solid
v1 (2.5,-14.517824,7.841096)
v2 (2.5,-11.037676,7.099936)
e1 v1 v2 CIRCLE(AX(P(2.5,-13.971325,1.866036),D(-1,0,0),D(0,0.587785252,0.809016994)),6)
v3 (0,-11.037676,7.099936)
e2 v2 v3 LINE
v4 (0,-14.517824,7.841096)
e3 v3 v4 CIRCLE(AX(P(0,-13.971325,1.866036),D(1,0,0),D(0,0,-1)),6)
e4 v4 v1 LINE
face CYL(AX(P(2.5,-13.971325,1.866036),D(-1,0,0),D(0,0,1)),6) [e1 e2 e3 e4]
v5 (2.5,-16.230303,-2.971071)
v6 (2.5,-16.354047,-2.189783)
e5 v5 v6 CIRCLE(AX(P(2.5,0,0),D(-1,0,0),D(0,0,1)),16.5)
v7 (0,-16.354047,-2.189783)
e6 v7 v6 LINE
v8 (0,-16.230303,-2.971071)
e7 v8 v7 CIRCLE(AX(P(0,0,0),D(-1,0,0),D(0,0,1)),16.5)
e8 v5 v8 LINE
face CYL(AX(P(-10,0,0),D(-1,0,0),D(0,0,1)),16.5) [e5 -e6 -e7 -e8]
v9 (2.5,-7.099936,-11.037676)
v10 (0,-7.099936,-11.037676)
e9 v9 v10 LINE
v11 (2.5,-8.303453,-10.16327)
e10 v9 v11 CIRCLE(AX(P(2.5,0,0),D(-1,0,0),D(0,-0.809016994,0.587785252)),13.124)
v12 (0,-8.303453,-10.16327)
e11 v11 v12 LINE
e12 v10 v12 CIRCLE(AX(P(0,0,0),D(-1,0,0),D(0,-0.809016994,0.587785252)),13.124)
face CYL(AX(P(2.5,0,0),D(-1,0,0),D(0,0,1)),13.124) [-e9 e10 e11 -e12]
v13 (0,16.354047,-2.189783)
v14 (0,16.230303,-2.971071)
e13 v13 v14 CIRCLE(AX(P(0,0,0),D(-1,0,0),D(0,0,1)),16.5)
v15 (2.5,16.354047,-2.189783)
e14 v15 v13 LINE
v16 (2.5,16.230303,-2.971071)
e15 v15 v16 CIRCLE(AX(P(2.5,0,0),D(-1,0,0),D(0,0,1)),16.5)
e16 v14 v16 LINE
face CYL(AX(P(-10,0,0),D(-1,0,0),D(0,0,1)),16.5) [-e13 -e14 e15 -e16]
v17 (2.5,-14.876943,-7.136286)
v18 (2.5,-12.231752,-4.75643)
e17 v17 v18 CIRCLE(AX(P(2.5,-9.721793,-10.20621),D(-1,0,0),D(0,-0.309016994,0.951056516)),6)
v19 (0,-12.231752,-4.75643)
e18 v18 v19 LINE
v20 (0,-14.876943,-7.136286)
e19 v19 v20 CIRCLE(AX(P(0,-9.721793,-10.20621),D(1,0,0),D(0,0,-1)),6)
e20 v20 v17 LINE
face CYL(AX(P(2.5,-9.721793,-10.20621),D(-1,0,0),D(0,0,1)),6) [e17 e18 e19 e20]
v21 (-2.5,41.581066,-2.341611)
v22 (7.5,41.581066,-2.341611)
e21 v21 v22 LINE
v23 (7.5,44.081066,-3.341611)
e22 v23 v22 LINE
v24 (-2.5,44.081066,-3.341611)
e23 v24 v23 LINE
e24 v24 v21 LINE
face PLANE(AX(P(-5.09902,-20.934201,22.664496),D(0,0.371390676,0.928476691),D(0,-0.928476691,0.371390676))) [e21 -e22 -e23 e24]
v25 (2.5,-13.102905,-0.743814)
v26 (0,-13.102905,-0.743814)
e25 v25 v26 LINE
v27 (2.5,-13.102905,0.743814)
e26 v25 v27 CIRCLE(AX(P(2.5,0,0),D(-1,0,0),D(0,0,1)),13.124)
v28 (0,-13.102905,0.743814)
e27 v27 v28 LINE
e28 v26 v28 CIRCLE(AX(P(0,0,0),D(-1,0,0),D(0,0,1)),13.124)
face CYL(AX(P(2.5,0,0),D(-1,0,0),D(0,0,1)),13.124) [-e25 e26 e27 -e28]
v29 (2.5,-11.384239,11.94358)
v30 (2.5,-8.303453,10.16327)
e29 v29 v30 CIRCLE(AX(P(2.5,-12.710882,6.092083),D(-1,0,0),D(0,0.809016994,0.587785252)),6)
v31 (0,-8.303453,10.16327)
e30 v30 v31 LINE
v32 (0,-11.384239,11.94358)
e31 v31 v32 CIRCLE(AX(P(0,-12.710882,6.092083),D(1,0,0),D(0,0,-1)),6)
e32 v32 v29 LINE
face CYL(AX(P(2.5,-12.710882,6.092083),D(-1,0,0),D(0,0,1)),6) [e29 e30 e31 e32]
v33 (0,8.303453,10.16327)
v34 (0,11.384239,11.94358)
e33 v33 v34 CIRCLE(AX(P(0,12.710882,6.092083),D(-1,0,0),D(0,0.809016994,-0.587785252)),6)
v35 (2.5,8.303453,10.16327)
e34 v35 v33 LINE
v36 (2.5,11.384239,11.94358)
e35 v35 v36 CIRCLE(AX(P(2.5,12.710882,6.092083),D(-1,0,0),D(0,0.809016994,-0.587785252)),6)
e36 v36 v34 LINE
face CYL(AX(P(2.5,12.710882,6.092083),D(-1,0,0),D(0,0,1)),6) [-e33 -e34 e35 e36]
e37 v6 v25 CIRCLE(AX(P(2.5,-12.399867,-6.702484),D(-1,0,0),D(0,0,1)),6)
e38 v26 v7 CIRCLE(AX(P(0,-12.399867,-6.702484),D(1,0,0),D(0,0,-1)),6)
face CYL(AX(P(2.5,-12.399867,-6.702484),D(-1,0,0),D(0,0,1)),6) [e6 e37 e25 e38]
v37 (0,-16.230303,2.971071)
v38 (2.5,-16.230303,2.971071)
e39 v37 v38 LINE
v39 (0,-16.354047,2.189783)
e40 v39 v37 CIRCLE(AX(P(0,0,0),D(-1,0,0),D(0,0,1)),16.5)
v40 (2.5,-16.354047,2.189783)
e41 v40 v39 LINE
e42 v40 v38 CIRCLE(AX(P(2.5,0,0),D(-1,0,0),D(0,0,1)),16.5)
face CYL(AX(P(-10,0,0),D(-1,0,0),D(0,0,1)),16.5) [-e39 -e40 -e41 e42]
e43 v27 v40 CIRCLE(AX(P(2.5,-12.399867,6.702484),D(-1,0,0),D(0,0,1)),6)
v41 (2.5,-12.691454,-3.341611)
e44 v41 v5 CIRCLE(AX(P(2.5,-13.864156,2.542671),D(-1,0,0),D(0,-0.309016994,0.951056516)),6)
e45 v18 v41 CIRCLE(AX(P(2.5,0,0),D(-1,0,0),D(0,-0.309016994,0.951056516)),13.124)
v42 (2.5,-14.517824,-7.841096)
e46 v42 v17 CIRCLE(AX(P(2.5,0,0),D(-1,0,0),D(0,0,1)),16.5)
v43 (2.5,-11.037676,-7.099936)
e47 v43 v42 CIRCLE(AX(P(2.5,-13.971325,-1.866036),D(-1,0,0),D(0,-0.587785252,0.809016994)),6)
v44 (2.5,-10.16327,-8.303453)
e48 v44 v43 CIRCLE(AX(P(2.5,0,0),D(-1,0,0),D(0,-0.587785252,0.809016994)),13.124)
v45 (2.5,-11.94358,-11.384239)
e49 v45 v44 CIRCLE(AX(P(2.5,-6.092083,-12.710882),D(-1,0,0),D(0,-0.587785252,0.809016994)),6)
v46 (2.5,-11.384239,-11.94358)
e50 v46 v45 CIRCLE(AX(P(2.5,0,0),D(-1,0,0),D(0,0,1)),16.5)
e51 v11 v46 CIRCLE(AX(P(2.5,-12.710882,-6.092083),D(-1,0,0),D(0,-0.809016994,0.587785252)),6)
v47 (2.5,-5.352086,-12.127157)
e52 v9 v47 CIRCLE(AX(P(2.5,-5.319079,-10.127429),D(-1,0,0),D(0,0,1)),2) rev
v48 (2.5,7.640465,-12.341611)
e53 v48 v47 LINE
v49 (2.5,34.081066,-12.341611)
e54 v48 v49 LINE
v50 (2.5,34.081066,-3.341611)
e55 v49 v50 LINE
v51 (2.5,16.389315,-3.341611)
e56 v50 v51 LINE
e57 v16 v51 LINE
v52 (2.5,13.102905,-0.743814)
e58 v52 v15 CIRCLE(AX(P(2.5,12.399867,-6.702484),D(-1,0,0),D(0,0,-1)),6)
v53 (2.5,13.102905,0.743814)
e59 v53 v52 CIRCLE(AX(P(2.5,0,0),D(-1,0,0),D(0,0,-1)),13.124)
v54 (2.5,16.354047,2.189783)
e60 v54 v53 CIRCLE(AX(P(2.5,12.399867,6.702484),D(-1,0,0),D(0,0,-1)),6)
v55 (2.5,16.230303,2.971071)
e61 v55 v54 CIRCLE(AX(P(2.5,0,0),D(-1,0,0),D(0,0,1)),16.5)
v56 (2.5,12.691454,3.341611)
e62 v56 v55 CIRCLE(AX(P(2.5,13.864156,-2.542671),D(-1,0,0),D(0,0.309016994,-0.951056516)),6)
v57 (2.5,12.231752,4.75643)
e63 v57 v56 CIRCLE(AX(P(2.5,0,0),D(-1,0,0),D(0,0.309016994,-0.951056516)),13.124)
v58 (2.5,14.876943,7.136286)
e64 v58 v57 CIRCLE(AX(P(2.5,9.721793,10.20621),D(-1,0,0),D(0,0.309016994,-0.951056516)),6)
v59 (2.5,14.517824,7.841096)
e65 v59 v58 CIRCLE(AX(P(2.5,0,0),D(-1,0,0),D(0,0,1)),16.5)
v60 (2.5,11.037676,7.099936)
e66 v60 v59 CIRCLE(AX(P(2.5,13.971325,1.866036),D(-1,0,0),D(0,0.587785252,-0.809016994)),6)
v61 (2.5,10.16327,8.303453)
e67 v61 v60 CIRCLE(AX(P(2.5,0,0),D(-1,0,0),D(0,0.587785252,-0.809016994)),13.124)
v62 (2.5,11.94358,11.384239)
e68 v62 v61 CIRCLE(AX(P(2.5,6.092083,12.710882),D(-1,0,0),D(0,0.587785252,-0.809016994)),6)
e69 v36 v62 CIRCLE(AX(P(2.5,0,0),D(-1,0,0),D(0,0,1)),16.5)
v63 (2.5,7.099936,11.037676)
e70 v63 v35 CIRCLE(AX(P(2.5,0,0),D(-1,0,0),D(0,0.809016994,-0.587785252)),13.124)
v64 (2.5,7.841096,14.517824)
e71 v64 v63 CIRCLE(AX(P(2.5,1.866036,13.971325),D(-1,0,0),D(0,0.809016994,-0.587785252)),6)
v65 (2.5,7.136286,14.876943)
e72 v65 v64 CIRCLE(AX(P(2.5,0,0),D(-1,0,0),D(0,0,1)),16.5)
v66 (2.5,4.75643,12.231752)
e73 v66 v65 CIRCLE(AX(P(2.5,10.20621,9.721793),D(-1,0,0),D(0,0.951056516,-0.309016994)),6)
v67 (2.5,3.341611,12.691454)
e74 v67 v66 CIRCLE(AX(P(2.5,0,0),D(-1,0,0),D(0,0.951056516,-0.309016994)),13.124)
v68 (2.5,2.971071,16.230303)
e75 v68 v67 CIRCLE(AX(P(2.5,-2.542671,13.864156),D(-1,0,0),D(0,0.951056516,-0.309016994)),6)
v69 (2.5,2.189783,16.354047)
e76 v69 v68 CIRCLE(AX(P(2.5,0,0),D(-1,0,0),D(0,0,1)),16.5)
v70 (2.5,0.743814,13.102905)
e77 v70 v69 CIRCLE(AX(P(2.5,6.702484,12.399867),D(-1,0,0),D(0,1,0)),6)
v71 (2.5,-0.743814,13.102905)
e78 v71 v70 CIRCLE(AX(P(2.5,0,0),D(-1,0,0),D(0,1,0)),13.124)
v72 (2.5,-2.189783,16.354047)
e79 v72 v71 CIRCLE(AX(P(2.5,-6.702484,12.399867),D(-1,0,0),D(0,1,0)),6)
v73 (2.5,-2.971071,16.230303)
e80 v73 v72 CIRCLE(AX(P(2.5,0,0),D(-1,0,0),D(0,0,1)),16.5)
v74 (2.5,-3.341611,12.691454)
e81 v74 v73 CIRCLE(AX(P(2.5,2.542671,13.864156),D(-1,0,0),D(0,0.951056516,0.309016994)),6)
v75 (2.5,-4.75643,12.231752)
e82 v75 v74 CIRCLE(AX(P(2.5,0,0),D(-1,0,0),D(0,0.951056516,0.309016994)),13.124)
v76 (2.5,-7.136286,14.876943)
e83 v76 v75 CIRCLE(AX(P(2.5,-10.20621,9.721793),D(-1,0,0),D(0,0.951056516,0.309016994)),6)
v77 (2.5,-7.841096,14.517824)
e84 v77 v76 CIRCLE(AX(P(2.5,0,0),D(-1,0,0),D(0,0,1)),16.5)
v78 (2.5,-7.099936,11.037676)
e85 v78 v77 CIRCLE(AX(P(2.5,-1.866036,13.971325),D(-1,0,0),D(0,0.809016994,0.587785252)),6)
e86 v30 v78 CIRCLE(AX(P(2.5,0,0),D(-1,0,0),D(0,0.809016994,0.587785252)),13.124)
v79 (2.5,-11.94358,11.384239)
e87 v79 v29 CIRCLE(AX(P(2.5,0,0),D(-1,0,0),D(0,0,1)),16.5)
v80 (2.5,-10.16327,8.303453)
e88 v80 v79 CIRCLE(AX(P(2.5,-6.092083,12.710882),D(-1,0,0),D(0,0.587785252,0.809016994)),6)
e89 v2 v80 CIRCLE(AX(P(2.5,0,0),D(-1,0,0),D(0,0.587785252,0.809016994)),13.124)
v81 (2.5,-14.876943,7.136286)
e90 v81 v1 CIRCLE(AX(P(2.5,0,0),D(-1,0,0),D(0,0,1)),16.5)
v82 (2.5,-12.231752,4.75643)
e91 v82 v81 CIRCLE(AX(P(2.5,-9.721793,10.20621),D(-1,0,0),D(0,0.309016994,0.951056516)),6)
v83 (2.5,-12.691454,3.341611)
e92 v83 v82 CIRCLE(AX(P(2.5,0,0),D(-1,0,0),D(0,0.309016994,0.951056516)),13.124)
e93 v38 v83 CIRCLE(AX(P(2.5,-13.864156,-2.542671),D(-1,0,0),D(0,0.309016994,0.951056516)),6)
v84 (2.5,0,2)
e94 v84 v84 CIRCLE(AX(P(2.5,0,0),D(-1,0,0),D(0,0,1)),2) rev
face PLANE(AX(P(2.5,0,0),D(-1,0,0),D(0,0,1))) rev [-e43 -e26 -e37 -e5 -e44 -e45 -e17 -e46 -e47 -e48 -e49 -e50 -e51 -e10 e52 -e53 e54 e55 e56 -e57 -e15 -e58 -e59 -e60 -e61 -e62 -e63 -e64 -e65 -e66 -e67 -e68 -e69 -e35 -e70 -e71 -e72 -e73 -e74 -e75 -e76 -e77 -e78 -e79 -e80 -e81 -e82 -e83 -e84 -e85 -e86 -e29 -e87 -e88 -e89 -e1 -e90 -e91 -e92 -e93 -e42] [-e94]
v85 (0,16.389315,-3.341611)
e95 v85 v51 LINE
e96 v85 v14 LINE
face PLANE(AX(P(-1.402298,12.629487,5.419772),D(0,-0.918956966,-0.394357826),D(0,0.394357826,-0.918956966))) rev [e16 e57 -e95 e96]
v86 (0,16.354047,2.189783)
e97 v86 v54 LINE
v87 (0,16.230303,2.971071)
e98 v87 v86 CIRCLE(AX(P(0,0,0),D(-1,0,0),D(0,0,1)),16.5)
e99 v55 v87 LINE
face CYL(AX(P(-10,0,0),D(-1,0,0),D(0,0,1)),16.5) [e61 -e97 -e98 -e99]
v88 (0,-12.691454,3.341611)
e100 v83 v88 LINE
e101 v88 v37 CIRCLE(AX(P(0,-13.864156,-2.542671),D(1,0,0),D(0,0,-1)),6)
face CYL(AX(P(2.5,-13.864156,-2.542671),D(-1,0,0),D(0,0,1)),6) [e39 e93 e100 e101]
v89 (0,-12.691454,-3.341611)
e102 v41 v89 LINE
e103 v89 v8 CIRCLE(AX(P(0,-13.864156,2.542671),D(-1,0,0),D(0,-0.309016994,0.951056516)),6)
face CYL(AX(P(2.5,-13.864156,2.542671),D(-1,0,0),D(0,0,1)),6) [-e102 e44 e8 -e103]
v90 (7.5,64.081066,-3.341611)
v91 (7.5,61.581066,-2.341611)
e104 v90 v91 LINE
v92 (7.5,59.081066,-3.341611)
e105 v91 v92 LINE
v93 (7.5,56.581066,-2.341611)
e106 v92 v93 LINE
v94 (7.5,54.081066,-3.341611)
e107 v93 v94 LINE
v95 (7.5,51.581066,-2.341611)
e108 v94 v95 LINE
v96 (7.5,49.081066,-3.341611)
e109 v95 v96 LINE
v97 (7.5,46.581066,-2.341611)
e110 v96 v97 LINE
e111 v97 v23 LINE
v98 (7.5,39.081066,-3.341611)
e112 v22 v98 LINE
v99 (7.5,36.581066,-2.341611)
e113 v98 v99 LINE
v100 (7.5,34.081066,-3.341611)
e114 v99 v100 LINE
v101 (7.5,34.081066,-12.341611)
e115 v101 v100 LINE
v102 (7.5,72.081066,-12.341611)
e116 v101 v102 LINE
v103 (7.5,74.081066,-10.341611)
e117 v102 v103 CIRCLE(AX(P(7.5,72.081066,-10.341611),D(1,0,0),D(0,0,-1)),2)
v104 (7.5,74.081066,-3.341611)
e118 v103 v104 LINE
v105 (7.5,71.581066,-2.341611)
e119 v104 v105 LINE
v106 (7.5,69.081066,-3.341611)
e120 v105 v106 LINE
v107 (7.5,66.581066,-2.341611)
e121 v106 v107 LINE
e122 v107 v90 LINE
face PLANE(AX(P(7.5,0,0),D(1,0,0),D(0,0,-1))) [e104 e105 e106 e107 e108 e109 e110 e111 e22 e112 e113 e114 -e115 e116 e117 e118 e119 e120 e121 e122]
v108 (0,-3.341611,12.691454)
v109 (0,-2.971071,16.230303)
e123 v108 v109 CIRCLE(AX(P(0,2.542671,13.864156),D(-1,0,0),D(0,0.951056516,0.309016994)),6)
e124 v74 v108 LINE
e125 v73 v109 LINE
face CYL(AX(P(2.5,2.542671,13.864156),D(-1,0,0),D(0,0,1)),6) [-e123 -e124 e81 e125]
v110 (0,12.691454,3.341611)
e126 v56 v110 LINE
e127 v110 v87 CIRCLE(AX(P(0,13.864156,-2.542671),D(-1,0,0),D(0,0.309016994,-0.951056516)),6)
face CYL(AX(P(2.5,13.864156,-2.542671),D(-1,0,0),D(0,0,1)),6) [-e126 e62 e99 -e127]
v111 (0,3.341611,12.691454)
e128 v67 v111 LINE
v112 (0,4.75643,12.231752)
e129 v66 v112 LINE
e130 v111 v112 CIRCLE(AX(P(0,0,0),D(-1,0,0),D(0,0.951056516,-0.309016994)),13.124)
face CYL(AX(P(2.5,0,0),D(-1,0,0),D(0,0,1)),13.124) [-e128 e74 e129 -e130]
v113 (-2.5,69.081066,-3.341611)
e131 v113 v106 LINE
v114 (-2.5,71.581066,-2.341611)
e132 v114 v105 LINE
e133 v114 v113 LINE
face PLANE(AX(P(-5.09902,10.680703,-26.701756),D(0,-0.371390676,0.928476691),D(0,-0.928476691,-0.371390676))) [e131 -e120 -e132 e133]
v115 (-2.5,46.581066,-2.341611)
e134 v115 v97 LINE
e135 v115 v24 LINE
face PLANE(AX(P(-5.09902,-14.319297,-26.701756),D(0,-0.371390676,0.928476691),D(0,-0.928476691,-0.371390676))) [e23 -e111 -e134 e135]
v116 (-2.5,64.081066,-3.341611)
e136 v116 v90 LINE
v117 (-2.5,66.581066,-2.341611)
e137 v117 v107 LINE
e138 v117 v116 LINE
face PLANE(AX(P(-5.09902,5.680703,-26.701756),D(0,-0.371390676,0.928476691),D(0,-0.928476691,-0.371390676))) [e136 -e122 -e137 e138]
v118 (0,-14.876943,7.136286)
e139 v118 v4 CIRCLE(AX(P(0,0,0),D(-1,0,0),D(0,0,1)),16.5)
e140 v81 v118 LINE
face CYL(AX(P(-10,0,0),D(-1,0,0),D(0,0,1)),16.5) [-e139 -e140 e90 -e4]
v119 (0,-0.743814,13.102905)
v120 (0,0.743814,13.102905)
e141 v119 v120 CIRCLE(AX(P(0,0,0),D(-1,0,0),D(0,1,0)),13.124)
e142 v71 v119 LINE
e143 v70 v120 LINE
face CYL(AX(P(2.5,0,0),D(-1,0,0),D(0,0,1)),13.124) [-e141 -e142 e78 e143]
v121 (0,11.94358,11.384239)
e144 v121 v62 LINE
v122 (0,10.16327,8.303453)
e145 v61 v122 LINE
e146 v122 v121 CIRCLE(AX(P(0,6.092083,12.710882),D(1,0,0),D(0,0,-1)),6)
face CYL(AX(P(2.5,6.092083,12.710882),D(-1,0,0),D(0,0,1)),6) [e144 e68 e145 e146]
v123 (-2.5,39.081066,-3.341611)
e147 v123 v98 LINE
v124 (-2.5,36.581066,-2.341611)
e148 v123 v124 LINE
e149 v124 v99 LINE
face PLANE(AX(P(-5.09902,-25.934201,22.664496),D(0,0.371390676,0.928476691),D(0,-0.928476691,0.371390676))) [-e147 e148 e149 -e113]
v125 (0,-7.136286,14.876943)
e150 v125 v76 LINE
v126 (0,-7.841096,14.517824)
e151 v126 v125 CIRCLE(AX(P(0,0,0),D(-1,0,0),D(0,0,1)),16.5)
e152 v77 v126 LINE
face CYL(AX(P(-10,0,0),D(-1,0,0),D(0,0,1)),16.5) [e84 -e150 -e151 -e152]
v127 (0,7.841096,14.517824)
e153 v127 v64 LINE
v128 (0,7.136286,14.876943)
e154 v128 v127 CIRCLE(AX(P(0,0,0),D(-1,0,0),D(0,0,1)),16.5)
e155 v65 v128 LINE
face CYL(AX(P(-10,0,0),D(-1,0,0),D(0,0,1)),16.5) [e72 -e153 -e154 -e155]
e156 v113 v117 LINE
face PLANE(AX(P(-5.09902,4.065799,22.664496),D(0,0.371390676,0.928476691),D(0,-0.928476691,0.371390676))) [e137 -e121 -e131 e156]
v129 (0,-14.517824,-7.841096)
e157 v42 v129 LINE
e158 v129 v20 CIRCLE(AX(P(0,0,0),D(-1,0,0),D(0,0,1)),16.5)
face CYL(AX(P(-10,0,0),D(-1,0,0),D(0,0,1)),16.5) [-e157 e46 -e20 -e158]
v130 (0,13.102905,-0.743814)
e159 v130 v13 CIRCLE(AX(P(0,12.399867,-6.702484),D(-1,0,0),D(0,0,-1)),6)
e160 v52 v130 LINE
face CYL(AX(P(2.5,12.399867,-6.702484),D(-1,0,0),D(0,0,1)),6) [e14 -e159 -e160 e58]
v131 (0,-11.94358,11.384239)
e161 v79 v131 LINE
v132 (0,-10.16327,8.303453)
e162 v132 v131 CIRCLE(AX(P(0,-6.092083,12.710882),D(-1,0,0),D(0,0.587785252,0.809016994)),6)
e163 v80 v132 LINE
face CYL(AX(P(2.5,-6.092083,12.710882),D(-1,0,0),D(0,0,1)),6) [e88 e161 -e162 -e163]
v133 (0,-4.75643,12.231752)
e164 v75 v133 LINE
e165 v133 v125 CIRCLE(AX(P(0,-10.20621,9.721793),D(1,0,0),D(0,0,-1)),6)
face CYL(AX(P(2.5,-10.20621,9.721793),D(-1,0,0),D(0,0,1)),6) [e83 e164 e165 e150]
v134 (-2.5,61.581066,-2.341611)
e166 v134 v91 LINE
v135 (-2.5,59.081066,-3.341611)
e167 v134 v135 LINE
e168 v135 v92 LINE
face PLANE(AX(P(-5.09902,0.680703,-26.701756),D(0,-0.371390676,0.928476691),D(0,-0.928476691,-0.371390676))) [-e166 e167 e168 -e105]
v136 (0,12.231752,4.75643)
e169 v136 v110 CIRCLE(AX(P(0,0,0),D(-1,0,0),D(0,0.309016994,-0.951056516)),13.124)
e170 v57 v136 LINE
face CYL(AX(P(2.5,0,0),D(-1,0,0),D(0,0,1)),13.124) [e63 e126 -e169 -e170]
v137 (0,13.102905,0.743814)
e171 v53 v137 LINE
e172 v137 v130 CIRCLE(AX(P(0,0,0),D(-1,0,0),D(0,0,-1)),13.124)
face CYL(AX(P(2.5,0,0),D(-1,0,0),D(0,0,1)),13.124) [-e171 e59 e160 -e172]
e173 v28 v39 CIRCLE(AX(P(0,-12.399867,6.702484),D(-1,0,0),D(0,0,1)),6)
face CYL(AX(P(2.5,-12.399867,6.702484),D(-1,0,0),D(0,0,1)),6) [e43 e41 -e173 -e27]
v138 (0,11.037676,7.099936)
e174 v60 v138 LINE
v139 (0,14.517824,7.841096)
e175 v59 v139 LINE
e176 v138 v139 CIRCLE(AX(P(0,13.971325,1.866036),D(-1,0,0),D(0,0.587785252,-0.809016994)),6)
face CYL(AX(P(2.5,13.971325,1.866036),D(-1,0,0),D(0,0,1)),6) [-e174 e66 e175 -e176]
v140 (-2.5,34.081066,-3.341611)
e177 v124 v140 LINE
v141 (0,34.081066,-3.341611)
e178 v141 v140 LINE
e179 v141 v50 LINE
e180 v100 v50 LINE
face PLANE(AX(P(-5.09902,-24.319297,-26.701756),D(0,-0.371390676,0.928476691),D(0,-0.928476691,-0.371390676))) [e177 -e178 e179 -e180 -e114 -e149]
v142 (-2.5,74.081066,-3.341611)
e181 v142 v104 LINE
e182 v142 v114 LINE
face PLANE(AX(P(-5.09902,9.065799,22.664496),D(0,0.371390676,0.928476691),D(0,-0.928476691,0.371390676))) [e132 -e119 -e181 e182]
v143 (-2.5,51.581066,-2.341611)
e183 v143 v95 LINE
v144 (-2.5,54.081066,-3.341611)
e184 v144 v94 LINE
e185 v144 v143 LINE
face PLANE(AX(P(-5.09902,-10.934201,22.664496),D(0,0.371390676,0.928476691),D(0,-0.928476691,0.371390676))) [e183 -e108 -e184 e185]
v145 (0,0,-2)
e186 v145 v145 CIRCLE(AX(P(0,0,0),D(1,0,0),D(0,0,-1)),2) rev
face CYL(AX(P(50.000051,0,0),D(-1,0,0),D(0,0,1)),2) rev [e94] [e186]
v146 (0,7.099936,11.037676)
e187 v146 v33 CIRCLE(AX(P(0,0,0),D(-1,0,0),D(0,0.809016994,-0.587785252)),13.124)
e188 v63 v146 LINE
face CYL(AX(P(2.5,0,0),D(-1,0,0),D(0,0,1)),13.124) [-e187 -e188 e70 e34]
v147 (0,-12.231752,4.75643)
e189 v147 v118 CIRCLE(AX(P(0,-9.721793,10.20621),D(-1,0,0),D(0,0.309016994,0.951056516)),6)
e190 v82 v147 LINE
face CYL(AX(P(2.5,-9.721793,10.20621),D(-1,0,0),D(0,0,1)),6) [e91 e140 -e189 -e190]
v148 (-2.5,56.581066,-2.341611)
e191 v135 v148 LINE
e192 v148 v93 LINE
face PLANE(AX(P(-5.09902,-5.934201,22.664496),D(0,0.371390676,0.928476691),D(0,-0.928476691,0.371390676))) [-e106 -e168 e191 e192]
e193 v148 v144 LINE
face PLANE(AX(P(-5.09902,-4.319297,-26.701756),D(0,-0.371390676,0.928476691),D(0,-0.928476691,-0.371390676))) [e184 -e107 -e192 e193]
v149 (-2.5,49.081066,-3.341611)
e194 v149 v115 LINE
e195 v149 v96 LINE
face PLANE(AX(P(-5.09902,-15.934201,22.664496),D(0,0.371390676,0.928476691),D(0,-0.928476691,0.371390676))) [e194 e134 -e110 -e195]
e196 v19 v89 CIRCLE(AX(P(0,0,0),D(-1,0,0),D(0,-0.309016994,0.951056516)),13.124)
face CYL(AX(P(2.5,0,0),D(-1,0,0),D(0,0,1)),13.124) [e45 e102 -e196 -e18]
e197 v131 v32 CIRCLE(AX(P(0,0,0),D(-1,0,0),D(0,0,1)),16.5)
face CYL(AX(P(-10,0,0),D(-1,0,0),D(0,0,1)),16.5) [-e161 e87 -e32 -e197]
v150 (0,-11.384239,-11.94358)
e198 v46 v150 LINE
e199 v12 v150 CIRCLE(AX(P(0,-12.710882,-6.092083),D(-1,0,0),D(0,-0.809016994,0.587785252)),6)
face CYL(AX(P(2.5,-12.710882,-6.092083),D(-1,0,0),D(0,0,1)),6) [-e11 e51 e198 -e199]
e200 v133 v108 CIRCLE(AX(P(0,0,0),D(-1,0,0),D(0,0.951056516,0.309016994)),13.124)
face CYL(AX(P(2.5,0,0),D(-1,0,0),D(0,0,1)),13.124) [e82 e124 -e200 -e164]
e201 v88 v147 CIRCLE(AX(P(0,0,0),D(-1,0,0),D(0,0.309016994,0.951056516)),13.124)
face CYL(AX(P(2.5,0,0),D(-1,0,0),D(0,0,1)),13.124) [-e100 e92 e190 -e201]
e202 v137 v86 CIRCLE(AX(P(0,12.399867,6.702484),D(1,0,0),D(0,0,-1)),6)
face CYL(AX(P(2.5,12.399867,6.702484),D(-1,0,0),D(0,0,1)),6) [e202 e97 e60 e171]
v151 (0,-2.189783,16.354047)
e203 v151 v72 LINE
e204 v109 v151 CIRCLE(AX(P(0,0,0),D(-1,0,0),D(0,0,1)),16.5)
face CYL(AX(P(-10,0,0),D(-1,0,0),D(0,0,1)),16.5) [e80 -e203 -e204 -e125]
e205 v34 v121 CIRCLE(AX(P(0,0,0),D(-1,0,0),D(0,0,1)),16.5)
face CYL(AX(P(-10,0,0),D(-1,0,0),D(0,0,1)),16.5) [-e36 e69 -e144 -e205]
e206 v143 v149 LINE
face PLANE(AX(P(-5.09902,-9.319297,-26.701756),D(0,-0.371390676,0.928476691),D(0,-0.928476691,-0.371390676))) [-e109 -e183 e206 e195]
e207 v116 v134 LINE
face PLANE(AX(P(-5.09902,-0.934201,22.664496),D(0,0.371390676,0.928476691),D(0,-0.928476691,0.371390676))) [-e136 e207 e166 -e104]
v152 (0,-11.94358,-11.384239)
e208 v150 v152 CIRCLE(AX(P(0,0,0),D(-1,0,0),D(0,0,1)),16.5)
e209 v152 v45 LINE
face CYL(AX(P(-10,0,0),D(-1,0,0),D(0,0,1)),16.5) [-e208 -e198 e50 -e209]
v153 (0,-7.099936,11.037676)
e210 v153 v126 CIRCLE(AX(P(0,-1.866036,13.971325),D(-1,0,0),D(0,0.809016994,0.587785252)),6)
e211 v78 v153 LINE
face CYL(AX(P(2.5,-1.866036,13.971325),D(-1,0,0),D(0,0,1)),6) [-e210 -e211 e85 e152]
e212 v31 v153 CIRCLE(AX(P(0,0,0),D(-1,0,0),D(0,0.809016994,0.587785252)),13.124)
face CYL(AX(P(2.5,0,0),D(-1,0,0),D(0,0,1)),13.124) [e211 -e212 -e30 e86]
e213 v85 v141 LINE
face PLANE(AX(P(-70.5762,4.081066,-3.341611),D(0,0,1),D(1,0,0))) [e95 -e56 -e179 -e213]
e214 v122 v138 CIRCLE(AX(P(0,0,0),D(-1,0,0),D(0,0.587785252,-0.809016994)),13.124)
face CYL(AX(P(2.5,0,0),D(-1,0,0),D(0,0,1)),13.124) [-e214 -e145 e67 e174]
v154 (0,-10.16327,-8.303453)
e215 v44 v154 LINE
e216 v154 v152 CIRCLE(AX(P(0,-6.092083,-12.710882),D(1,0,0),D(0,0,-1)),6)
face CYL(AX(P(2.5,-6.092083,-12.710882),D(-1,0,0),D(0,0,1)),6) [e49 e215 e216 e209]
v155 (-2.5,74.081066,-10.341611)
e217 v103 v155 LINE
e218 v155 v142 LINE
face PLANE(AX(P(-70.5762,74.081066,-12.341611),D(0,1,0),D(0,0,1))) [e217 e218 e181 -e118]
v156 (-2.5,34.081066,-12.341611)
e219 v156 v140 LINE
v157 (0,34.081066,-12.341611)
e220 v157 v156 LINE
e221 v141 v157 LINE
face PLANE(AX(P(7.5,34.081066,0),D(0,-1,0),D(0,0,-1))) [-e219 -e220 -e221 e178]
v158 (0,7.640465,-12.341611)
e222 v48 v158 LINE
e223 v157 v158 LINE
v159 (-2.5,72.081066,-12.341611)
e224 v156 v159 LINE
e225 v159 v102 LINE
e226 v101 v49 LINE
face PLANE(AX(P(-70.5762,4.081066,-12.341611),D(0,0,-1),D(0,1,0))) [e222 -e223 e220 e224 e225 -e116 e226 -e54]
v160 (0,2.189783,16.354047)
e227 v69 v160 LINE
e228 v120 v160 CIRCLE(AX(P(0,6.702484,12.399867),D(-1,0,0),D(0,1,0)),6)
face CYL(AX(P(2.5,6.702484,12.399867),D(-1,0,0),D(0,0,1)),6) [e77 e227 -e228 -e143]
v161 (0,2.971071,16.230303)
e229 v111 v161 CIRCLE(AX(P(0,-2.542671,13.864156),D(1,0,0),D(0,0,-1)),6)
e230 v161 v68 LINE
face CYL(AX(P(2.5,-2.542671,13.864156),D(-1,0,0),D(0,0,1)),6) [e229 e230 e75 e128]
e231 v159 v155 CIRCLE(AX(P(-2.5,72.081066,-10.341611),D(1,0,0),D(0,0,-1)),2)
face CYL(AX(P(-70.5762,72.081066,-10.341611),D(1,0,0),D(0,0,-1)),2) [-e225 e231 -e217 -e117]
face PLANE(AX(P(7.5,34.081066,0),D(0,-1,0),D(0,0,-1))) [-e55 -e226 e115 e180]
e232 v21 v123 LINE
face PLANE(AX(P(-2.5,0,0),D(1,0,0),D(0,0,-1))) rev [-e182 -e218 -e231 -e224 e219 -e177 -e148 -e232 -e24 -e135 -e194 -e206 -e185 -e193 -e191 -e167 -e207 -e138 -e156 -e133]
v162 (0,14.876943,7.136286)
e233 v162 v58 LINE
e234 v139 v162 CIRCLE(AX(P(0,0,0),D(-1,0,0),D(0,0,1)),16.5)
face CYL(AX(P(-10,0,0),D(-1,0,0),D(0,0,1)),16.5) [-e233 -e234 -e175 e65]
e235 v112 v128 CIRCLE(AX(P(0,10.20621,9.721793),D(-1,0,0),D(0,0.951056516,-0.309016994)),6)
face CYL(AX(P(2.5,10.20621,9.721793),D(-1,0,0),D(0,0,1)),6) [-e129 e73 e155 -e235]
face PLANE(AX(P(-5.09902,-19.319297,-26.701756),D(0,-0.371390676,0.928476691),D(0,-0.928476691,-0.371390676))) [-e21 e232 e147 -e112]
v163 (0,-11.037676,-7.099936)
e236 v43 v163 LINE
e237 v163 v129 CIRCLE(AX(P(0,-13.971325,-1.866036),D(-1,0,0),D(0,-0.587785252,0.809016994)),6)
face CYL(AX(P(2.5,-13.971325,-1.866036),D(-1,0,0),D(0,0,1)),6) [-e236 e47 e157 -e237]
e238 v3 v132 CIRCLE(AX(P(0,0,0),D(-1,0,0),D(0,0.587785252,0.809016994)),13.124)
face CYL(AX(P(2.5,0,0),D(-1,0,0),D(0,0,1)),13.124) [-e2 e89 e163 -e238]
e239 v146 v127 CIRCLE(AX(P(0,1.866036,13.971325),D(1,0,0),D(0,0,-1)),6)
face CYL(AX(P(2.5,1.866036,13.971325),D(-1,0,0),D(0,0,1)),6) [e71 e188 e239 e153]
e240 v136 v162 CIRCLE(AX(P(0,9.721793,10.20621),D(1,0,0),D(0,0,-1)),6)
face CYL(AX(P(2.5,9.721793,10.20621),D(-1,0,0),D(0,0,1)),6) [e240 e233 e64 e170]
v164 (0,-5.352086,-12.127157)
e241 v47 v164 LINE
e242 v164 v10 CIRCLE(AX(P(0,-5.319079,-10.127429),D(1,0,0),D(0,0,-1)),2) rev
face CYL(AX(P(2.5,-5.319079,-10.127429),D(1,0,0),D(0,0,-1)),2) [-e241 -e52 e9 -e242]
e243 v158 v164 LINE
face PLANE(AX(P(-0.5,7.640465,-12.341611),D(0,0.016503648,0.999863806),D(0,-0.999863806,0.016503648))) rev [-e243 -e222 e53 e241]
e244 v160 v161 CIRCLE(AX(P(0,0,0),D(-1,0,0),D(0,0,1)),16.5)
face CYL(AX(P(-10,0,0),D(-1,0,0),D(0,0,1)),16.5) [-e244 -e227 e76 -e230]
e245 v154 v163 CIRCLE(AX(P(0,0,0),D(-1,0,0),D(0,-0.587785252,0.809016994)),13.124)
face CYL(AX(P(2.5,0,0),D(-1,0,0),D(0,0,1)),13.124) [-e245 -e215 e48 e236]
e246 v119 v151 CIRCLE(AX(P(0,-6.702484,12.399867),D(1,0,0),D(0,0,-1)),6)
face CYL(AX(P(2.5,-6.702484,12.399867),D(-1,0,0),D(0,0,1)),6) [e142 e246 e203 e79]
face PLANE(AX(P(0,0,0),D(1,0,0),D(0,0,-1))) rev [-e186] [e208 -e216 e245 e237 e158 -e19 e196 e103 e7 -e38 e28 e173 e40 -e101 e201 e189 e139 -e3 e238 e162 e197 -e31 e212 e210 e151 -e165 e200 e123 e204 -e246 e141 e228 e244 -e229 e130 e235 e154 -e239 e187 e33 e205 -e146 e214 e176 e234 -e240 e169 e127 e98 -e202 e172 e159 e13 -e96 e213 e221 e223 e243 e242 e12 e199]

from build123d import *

# Parameters (mm, degrees)
BASPROSKE_W         = 2.5
BASPROSKE_H         = 16.5
TOOTHCUT_DEPTH      = 24.468063405
TEETHCUTS_COUNT     = 20
TEETHCUTS_ANGLE     = 342
BORSKE_R            = 2
BORE_DEPTH          = 50.0000508
SKETCH1_W           = 9
SKETCH1_H           = 70
BOSS_EXTRUDE2_DEPTH = 2.5
BOSS_EXTRUDE3_DEPTH = 2.5
LPATTERN2_COUNT     = 8
LPATTERN2_PITCH     = 5
CUT_EXTRUDE1_DEPTH  = 3
FILLET3_R           = 2
FILLET4_R           = 2
BOSS_EXTRUDE4_START = -2.5
BOSS_EXTRUDE4_DEPTH = 2.5
BOSS_EXTRUDE5_DEPTH = 5


with BuildPart() as part:
    # BasProSke → Base-Revolve (revolve)
    with BuildSketch(Plane(origin=(0, 0, 0), x_dir=(1, 0, 0), z_dir=(0, 1, 0)), mode=Mode.PRIVATE) as base_revolve_sk:
        with Locations((1.25, 8.25)):
            Rectangle(BASPROSKE_W, BASPROSKE_H)
    revolve(base_revolve_sk.sketch.rotate(Axis((-10, 0, 0), (1, 0, 0)), 180), axis=Axis((-10, 0, 0), (1, 0, 0)))

    # TooCutSke → ToothCut (cut, through all)
    with BuildSketch(Plane(origin=(0, 0, 0), x_dir=(0, 0, -1), z_dir=(1, 0, 0))):
        with BuildLine():
            ThreePointArc((0.74381438, 13.102904875), (0, 13.124), (-0.74381438, 13.102904875))
            ThreePointArc((-0.74381438, 13.102904875), (-1.226473103, 14.852072512), (-2.209965745, 16.376962373))
            ThreePointArc((-2.209965745, 16.376962373), (0, 16.5254), (2.209965745, 16.376962373))
            ThreePointArc((2.209965745, 16.376962373), (1.226473103, 14.852072512), (0.74381438, 13.102904875))
        make_face()
    toothcut = extrude(amount=TOOTHCUT_DEPTH, mode=Mode.SUBTRACT)

    # TeethCuts: ToothCut ×20 about axis
    teethcuts_axis = Axis((-10, 0, 0), (1, 0, 0))
    for i in range(1, TEETHCUTS_COUNT):
        add(toothcut.rotate(teethcuts_axis, i * TEETHCUTS_ANGLE / (TEETHCUTS_COUNT - 1)), mode=Mode.SUBTRACT)

    # BorSke → Bore (cut, symmetric)
    with BuildSketch(Plane(origin=(0, 0, 0), x_dir=(0, 0, -1), z_dir=(1, 0, 0))):
        with Locations(Location((0, 0, 0), (0, 0, 180))):
            Circle(BORSKE_R)
    extrude(amount=BORE_DEPTH, both=True, mode=Mode.SUBTRACT)

    # Sketch1 → Boss-Extrude2 (add)
    with BuildSketch(Plane(origin=(2.5, 0, 0), x_dir=(0, 0, -1), z_dir=(1, 0, 0))):
        with Locations((7.841610769, 39.08106639)):
            Rectangle(SKETCH1_W, SKETCH1_H)
    extrude(amount=-BOSS_EXTRUDE2_DEPTH)

    # Sketch2 → Boss-Extrude3 (add)
    with BuildSketch(Plane(origin=(2.5, 0, 0), x_dir=(0, 0, -1), z_dir=(1, 0, 0))):
        Polygon((2.341610769, 71.58106639), (3.341610769, 69.08106639), (3.341610769, 74.08106639), align=None)
    boss_extrude3 = extrude(amount=-BOSS_EXTRUDE3_DEPTH)

    # LPattern2: Boss-Extrude3 ×8
    with Locations(*[(0, -i * LPATTERN2_PITCH, 0) for i in range(1, LPATTERN2_COUNT)]):
        add(boss_extrude3)

    # Sketch3 → Cut-Extrude1 (cut)
    with BuildSketch(Plane(origin=(2.5, 0, 0), x_dir=(0, 0, -1), z_dir=(1, 0, 0))):
        Polygon((12.341610769, 7.640465379), (11.943579641, -16.474016898), (28.120591599, -19.002507116), (23.794346737, 10.948418847), align=None)
    extrude(amount=-CUT_EXTRUDE1_DEPTH, mode=Mode.SUBTRACT)

    # Fillet3
    # the kernel refuses this fillet: 2 mm, written as the material it takes off along each edge
    with BuildSketch(Plane(origin=(8.029722145, -7.563673717, -12.090652836), x_dir=(0, 0.40305029289493355, 0.9151778304773931), z_dir=(-1, 0, 0))) as fillet3_piece_1:
        with BuildLine():
            CenterArc((2.701383145, 1.26292574), FILLET3_R, 157.176626249, 61.981506818)
            Line((0.857973168, 2.038708994), (0.821104969, 2.054224659))
            Line((0.821104969, 2.054224659), (-0.0368682, 0.015515665))
            Line((-0.0368682, 0.015515665), (-0.003835236, -0.039815713))
            ThreePointArc((-0.003835236, -0.039815713), (0.575285457, -0.067643125), (1.119554669, -0.025258515))
            Line((1.119554669, -0.025258515), (1.150570914, 0))
        make_face()
    extrude(amount=13.55944429, mode=Mode.SUBTRACT)

    # Fillet4
    fillet4_edges = [part.edges().sort_by_distance(p)[0] for p in [
        (1.25, 74.08106639, -12.341610769),
    ]]
    fillet(fillet4_edges, radius=FILLET4_R)

    # Sketch5 → Boss-Extrude4 (add)
    with BuildSketch(Plane(origin=(2.5, 0, 0), x_dir=(0, 0, -1), z_dir=(1, 0, 0)).offset(BOSS_EXTRUDE4_START)):
        with BuildLine():
            ThreePointArc((3.341610769, 15.036857875), (3.187495997, 15.643253498), (2.971070911, 16.230303067))
            Line((2.971070911, 16.230303067), (3.341610769, 16.389315184))
            Line((3.341610769, 16.389315184), (3.341610769, 15.036857875))
        make_face()
    extrude(amount=BOSS_EXTRUDE4_DEPTH)

    # Sketch6 → Boss-Extrude5 (add, symmetric)
    with BuildSketch(Plane(origin=(2.5, 0, 0), x_dir=(0, 0, -1), z_dir=(1, 0, 0))):
        with BuildLine():
            Line((3.341610769, 34.08106639), (12.341610769, 34.08106639))
            Line((12.341610769, 34.08106639), (12.341610769, 72.08106639))
            ThreePointArc((12.341610769, 72.08106639), (11.755824331, 73.495279952), (10.341610769, 74.08106639))
            Line((10.341610769, 74.08106639), (3.341610769, 74.08106639))
            Line((3.341610769, 74.08106639), (2.341610769, 71.58106639))
            Line((2.341610769, 71.58106639), (3.341610769, 69.08106639))
            Line((3.341610769, 69.08106639), (2.341610769, 66.58106639))
            Line((2.341610769, 66.58106639), (3.341610769, 64.08106639))
            Line((3.341610769, 64.08106639), (2.341610769, 61.58106639))
            Line((2.341610769, 61.58106639), (3.341610769, 59.08106639))
            Line((3.341610769, 59.08106639), (2.341610769, 56.58106639))
            Line((2.341610769, 56.58106639), (3.341610769, 54.08106639))
            Line((3.341610769, 54.08106639), (2.341610769, 51.58106639))
            Line((2.341610769, 51.58106639), (3.341610769, 49.08106639))
            Line((3.341610769, 49.08106639), (2.341610769, 46.58106639))
            Line((2.341610769, 46.58106639), (3.341610769, 44.08106639))
            Line((3.341610769, 44.08106639), (2.341610769, 41.58106639))
            Line((2.341610769, 41.58106639), (3.341610769, 39.08106639))
            Line((3.341610769, 39.08106639), (2.341610769, 36.58106639))
            Line((2.341610769, 36.58106639), (3.341610769, 34.08106639))
        make_face()
    extrude(amount=BOSS_EXTRUDE5_DEPTH, both=True)


solid = part.part
